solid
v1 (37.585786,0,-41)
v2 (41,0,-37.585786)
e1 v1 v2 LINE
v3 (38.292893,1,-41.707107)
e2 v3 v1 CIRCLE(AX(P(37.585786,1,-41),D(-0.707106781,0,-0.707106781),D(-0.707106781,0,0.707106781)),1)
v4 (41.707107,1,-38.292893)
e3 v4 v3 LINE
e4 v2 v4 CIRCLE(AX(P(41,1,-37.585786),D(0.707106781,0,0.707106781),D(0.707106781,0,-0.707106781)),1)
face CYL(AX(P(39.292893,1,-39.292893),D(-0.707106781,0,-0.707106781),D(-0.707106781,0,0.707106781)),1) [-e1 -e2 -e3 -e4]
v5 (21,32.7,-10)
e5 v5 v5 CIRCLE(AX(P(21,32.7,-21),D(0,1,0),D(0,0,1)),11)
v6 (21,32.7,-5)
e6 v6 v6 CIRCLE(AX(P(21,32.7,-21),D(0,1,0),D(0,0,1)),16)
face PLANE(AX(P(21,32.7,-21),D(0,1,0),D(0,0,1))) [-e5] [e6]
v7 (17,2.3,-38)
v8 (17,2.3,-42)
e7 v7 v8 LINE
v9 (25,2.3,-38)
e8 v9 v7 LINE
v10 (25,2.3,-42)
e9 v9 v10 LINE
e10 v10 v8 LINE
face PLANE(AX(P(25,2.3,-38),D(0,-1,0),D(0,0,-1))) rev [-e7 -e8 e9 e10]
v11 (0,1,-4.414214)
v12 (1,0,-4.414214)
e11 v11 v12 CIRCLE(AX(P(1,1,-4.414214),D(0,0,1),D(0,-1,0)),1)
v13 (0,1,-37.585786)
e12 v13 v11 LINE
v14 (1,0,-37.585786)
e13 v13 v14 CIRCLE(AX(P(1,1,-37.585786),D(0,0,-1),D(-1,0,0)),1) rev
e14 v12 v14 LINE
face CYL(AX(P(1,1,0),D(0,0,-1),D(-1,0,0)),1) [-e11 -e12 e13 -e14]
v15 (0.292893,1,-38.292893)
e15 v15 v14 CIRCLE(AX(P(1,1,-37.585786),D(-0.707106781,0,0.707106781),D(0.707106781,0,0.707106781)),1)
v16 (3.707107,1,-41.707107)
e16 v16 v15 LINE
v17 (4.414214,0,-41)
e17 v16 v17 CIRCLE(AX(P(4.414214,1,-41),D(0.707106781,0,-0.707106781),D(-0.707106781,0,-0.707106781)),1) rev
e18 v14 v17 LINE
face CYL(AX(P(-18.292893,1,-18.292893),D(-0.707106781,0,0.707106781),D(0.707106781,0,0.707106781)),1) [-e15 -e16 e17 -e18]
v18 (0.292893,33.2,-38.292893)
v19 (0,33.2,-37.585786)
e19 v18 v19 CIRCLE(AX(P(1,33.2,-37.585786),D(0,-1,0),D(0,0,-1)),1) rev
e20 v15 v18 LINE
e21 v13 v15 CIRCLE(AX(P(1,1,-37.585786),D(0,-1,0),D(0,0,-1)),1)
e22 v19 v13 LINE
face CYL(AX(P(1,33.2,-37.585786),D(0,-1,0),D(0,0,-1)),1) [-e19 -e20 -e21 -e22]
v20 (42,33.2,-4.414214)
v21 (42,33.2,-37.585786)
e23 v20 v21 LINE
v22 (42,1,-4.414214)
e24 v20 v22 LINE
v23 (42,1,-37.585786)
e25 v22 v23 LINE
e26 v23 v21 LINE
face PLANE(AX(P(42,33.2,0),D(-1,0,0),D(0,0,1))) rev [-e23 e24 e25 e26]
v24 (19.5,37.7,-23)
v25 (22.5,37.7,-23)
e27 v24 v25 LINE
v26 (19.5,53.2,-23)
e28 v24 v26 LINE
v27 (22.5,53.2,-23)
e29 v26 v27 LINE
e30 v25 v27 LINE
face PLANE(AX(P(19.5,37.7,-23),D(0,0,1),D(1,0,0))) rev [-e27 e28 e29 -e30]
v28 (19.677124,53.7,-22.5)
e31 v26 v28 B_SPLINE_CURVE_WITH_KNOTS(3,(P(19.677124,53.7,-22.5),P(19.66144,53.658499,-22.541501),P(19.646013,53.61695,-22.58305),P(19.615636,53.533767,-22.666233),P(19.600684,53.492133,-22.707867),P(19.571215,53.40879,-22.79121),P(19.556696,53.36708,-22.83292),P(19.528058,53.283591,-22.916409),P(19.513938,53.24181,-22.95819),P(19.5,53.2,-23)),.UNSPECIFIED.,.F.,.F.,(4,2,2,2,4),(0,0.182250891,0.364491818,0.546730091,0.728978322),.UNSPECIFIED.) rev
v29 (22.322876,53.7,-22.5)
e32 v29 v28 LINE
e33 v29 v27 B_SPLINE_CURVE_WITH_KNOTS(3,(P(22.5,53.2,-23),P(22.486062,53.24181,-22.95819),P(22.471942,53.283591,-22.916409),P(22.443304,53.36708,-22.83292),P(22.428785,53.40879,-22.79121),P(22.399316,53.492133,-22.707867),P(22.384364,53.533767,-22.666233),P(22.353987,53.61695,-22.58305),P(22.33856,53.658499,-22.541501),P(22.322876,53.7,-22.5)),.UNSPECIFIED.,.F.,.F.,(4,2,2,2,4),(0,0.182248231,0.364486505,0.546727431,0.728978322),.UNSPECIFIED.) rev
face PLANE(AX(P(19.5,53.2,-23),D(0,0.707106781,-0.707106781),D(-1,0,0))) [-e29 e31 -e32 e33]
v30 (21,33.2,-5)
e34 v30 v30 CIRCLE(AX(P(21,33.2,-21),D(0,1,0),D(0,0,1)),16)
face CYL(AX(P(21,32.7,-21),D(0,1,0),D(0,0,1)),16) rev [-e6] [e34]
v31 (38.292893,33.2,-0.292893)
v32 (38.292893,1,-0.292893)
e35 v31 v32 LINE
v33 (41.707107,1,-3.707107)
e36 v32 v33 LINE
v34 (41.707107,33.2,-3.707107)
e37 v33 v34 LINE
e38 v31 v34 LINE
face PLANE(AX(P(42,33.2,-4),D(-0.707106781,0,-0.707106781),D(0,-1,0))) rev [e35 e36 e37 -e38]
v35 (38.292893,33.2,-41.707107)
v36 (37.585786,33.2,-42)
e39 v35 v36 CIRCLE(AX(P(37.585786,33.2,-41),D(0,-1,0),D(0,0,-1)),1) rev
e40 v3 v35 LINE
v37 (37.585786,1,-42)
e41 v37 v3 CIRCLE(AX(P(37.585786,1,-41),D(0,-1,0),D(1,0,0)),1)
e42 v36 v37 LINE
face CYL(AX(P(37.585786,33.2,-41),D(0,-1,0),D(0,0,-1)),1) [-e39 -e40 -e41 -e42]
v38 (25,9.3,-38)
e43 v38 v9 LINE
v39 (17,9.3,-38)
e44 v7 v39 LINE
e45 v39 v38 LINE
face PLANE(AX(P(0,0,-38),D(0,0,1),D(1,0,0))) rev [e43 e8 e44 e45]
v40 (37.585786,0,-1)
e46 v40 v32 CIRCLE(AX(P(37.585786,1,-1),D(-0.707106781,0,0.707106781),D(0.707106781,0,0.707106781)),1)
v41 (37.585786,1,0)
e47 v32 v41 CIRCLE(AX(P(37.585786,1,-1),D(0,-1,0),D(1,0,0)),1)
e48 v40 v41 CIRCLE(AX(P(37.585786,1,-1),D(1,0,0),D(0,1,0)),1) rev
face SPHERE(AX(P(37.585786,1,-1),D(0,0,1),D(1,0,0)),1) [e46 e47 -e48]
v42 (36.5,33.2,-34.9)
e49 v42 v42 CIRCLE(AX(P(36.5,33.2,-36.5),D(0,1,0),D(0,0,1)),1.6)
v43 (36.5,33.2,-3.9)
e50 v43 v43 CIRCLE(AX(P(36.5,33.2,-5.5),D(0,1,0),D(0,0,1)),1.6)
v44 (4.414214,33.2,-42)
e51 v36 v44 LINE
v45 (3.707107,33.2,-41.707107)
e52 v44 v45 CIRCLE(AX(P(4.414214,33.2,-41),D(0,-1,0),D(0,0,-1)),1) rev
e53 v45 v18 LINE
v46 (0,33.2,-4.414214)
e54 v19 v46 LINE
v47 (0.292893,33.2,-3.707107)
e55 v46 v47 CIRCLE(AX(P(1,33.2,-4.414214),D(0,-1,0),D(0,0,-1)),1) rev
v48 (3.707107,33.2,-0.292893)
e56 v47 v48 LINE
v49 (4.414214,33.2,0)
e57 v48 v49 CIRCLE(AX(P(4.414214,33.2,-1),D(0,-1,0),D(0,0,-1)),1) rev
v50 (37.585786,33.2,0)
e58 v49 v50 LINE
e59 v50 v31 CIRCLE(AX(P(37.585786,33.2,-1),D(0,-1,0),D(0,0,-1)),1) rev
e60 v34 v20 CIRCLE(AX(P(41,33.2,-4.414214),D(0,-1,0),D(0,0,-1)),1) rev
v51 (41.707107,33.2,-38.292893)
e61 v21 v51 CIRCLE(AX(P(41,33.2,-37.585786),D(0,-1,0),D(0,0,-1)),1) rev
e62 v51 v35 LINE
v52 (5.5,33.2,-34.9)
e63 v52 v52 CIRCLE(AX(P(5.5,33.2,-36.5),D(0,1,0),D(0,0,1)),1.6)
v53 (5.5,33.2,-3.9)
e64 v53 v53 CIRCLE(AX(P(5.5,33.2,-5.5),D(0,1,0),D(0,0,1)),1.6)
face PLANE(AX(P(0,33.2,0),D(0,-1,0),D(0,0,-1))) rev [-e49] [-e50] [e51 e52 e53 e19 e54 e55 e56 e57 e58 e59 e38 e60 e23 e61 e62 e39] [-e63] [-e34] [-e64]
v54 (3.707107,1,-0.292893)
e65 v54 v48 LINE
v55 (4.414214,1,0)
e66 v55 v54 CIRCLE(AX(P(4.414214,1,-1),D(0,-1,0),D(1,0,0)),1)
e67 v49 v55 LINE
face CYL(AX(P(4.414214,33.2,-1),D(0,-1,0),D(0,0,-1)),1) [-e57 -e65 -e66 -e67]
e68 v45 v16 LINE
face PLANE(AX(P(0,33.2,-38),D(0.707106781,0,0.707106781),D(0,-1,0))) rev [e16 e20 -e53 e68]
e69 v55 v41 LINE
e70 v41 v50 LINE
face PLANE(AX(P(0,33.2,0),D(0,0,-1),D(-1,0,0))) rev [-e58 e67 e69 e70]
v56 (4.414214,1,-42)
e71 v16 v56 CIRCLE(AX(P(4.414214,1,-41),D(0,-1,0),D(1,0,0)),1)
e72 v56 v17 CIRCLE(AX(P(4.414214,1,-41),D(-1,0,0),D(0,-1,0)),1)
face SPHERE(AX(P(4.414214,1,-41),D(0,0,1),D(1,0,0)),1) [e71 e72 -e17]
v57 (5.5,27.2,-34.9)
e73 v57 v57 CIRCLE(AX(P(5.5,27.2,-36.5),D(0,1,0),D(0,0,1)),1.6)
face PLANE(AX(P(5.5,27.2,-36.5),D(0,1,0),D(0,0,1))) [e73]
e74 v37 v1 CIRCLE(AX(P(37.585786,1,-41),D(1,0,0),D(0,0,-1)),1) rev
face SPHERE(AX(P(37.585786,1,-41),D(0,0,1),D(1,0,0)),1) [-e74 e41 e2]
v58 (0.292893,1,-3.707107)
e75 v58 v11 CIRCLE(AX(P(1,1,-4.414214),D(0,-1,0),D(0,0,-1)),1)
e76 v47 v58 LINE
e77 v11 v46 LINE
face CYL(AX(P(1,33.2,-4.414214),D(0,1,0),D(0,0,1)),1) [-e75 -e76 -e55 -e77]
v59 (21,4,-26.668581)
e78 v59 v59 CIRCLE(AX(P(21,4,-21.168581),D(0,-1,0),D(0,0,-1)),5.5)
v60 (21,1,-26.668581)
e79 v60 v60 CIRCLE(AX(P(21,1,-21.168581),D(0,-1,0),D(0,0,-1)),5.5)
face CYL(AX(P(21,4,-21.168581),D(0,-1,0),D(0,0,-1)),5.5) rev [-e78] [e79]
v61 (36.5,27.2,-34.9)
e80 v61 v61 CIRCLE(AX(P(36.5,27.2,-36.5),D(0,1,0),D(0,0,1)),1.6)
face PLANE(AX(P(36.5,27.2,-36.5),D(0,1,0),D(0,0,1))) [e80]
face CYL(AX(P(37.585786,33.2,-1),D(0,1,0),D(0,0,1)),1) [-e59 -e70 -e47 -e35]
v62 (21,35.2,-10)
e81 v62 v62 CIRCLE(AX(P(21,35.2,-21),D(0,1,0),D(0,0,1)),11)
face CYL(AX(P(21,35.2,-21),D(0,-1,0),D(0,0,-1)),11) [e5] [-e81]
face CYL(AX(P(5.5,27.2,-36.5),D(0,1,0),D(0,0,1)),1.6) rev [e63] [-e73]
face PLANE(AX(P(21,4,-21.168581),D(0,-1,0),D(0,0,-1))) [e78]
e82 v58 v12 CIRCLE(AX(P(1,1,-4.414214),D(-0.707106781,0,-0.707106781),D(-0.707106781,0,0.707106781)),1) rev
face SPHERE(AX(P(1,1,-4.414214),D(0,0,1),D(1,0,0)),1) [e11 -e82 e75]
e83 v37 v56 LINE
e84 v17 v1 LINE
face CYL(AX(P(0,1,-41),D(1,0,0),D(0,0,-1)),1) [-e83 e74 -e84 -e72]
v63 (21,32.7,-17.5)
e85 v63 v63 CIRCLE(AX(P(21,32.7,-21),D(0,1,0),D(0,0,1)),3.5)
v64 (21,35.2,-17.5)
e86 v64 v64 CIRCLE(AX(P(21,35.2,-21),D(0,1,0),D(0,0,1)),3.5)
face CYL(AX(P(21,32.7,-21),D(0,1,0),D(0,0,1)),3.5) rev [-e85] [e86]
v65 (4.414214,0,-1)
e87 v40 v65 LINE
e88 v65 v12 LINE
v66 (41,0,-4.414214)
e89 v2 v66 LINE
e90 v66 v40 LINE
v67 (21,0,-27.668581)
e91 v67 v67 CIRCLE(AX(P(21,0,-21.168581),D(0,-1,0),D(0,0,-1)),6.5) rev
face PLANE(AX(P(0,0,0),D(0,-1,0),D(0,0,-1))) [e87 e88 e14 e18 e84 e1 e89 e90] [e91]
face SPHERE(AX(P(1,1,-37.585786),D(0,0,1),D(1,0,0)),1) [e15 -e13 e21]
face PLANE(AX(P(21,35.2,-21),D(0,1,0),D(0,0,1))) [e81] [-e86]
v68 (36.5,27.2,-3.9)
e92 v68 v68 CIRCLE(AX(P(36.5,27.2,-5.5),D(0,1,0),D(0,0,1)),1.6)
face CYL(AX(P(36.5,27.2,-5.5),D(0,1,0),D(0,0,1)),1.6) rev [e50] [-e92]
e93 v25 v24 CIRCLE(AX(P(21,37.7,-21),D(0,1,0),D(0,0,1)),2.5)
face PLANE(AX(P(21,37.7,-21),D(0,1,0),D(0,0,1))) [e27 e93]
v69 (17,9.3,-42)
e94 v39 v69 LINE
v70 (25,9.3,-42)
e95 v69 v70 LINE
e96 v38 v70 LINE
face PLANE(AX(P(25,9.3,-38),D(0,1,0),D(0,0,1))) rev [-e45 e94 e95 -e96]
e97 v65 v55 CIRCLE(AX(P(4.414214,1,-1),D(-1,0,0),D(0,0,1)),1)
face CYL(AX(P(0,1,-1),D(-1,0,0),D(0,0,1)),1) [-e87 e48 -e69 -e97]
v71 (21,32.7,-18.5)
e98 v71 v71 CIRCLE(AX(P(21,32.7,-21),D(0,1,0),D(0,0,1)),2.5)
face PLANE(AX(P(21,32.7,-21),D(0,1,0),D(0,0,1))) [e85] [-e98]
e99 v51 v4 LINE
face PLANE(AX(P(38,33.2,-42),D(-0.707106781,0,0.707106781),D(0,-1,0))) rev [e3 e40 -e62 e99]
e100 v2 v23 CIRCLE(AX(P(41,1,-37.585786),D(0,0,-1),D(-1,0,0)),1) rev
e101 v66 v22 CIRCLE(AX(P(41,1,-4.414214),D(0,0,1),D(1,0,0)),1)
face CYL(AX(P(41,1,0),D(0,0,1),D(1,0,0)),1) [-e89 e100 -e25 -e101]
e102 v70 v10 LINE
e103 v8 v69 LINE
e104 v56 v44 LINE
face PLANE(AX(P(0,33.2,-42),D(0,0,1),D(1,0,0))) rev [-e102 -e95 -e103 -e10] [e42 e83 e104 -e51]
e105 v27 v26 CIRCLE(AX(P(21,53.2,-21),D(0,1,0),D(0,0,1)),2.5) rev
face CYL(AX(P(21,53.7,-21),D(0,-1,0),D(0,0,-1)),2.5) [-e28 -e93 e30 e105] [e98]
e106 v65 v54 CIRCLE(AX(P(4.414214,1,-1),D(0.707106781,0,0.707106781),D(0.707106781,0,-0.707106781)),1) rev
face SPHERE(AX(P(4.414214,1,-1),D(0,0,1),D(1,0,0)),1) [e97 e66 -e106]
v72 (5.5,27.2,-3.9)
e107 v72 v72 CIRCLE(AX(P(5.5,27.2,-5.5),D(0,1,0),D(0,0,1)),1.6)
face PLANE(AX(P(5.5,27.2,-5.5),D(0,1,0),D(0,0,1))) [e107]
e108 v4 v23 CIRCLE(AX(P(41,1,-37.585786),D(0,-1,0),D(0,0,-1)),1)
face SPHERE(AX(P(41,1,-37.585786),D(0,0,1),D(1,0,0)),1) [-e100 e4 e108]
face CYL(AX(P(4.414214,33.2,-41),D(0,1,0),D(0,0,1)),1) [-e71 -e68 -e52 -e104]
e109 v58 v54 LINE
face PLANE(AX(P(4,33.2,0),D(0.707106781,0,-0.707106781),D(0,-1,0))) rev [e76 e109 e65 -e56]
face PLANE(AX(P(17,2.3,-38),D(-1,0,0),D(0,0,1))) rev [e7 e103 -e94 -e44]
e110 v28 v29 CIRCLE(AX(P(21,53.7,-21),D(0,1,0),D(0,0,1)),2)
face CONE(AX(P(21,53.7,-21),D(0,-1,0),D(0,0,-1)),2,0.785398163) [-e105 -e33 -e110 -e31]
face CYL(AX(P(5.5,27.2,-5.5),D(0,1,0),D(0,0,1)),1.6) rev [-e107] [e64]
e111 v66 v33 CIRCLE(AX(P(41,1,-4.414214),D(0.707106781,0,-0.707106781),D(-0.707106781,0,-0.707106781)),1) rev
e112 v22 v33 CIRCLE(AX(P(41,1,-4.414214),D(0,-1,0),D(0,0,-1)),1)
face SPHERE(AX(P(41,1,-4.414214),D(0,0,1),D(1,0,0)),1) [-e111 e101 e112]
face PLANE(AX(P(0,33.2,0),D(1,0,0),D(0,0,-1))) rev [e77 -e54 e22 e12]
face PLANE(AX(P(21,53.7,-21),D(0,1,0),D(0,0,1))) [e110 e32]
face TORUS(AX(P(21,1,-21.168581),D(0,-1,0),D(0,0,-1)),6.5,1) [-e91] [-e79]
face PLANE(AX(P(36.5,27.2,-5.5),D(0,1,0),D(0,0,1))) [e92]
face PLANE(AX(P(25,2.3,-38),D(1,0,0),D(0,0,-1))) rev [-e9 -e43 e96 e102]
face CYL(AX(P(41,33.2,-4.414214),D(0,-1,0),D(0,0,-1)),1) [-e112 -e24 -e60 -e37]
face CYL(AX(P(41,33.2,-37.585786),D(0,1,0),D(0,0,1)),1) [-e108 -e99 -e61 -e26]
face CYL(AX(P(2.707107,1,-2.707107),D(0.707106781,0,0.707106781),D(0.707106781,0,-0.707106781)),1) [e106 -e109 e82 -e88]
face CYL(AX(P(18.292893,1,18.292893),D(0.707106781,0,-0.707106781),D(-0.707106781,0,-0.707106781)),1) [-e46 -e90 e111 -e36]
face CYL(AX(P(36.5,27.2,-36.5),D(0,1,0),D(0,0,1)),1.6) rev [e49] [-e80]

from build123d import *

# Parameters (mm, degrees)
SKETCH1_W           = 42
SKETCH1_H           = 42
BOSS_EXTRUDE1_DEPTH = 33.2
CHAMFER1_SIZE       = 4
SKETCH2_R           = 16
CUT_EXTRUDE1_DEPTH  = 0.5
SKETCH3_R           = 11
BOSS_EXTRUDE3_DEPTH = 2.5
SKETCH4_R           = 3.5
CUT_EXTRUDE2_DEPTH  = 2.5
SKETCH7_R           = 5.5
CUT_EXTRUDE4_DEPTH  = 4
SKETCH5_R           = 2.5
BOSS_EXTRUDE4_DEPTH = 21
CUT_EXTRUDE3_START  = -16
CUT_EXTRUDE3_DEPTH  = 16
CHAMFER2_SIZE       = 0.5
SKETCH8_R           = 1.6
CUT_EXTRUDE5_DEPTH  = 6
SKETCH9_W           = 8
SKETCH9_H           = 7
CUT_EXTRUDE6_DEPTH  = 4
FILLET1_R           = 1


with BuildPart() as part:
    # Sketch1 → Boss-Extrude1 (new body)
    with BuildSketch(Plane(origin=(0, 0, 0), x_dir=(1, 0, 0), z_dir=(0, 1, 0))):
        with Locations((21, 21)):
            Rectangle(SKETCH1_W, SKETCH1_H)
    extrude(amount=BOSS_EXTRUDE1_DEPTH)

    # Chamfer1
    chamfer1_edges = [part.edges().sort_by_distance(p)[0] for p in [
        (0, 16.6, -42),
        (42, 16.6, -42),
        (42, 16.6, 0),
        (0, 16.6, 0),
    ]]
    chamfer(chamfer1_edges, length=CHAMFER1_SIZE)

    # Sketch2 → Cut-Extrude1 (cut)
    with BuildSketch(Plane(origin=(0, 33.2, 0), x_dir=(1, 0, 0), z_dir=(0, 1, 0))):
        with Locations(Location((21, 21, 0), (0, 0, 270))):
            Circle(SKETCH2_R)
    extrude(amount=-CUT_EXTRUDE1_DEPTH, mode=Mode.SUBTRACT)

    # Sketch3 → Boss-Extrude3 (add)
    with BuildSketch(Plane(origin=(0, 32.7, 0), x_dir=(1, 0, 0), z_dir=(0, 1, 0))):
        with Locations(Location((21, 21, 0), (0, 0, 270))):
            Circle(SKETCH3_R)
    extrude(amount=BOSS_EXTRUDE3_DEPTH)

    # Sketch4 → Cut-Extrude2 (cut)
    with BuildSketch(Plane(origin=(0, 35.2, 0), x_dir=(1, 0, 0), z_dir=(0, 1, 0))):
        with Locations(Location((21, 21, 0), (0, 0, 270))):
            Circle(SKETCH4_R)
    extrude(amount=-CUT_EXTRUDE2_DEPTH, mode=Mode.SUBTRACT)

    # Sketch7 → Cut-Extrude4 (cut)
    with BuildSketch(Plane.XZ):
        with Locations(Location((21, -21.16858083, 0), (0, 0, 270))):
            Circle(SKETCH7_R)
    extrude(amount=-CUT_EXTRUDE4_DEPTH, mode=Mode.SUBTRACT)

    # Sketch5 → Boss-Extrude4 (add)
    with BuildSketch(Plane(origin=(0, 32.7, 0), x_dir=(1, 0, 0), z_dir=(0, 1, 0))):
        with Locations(Location((21, 21, 0), (0, 0, 90))):
            Circle(SKETCH5_R)
    extrude(amount=BOSS_EXTRUDE4_DEPTH)

    # Sketch6 → Cut-Extrude3 (cut)
    with BuildSketch(Plane(origin=(0, 53.7, 0), x_dir=(1, 0, 0), z_dir=(0, 1, 0)).offset(CUT_EXTRUDE3_START)):
        with BuildLine():
            Line((19.5, 23), (22.5, 23))
            ThreePointArc((22.5, 23), (21, 23.5), (19.5, 23))
        make_face()
    extrude(amount=CUT_EXTRUDE3_DEPTH, mode=Mode.SUBTRACT)

    # Chamfer2
    chamfer2_edges = [part.edges().sort_by_distance(p)[0] for p in [
        (21, 53.7, -18.5),
        (21, 53.7, -23),
    ]]
    chamfer(chamfer2_edges, length=CHAMFER2_SIZE - 0.0001)  # a hair under: the kernel refuses the full size

    # Sketch8 → Cut-Extrude5 (cut)
    with BuildSketch(Plane(origin=(0, 33.2, 0), x_dir=(1, 0, 0), z_dir=(0, 1, 0))):
        with Locations(Location((5.5, 36.5, 0), (0, 0, 270))):
            Circle(SKETCH8_R)
        with Locations(Location((36.5, 36.5, 0), (0, 0, 270))):
            Circle(SKETCH8_R)
        with Locations(Location((36.5, 5.5, 0), (0, 0, 270))):
            Circle(SKETCH8_R)
        with Locations(Location((5.5, 5.5, 0), (0, 0, 270))):
            Circle(SKETCH8_R)
    extrude(amount=-CUT_EXTRUDE5_DEPTH, mode=Mode.SUBTRACT)

    # Sketch9 → Cut-Extrude6 (cut)
    with BuildSketch(Plane(origin=(0, 0, -42), x_dir=(-1, 0, 0), z_dir=(0, 0, -1))):
        with Locations((-21, 5.8)):
            Rectangle(SKETCH9_W, SKETCH9_H)
    extrude(amount=-CUT_EXTRUDE6_DEPTH, mode=Mode.SUBTRACT)

    # Fillet1
    fillet1_edges = [part.edges().sort_by_distance(p)[0] for p in [
        (0, 0, -21),
        (0, 16.6, -4),
        (0, 16.6, -38),
        (21, 0, -42),
        (42, 0, -21),
        (21, 0, 0),
        (40, 0, -2),
        (2, 0, -2),
        (40, 0, -40),
        (2, 0, -40),
        (38, 16.6, -42),
        (4, 16.6, -42),
        (42, 16.6, -4),
        (42, 16.6, -38),
        (38, 16.6, 0),
        (4, 16.6, 0),
        (21, 0, -15.66858083),
    ]]
    fillet(fillet1_edges, radius=FILLET1_R)


solid = part.part
